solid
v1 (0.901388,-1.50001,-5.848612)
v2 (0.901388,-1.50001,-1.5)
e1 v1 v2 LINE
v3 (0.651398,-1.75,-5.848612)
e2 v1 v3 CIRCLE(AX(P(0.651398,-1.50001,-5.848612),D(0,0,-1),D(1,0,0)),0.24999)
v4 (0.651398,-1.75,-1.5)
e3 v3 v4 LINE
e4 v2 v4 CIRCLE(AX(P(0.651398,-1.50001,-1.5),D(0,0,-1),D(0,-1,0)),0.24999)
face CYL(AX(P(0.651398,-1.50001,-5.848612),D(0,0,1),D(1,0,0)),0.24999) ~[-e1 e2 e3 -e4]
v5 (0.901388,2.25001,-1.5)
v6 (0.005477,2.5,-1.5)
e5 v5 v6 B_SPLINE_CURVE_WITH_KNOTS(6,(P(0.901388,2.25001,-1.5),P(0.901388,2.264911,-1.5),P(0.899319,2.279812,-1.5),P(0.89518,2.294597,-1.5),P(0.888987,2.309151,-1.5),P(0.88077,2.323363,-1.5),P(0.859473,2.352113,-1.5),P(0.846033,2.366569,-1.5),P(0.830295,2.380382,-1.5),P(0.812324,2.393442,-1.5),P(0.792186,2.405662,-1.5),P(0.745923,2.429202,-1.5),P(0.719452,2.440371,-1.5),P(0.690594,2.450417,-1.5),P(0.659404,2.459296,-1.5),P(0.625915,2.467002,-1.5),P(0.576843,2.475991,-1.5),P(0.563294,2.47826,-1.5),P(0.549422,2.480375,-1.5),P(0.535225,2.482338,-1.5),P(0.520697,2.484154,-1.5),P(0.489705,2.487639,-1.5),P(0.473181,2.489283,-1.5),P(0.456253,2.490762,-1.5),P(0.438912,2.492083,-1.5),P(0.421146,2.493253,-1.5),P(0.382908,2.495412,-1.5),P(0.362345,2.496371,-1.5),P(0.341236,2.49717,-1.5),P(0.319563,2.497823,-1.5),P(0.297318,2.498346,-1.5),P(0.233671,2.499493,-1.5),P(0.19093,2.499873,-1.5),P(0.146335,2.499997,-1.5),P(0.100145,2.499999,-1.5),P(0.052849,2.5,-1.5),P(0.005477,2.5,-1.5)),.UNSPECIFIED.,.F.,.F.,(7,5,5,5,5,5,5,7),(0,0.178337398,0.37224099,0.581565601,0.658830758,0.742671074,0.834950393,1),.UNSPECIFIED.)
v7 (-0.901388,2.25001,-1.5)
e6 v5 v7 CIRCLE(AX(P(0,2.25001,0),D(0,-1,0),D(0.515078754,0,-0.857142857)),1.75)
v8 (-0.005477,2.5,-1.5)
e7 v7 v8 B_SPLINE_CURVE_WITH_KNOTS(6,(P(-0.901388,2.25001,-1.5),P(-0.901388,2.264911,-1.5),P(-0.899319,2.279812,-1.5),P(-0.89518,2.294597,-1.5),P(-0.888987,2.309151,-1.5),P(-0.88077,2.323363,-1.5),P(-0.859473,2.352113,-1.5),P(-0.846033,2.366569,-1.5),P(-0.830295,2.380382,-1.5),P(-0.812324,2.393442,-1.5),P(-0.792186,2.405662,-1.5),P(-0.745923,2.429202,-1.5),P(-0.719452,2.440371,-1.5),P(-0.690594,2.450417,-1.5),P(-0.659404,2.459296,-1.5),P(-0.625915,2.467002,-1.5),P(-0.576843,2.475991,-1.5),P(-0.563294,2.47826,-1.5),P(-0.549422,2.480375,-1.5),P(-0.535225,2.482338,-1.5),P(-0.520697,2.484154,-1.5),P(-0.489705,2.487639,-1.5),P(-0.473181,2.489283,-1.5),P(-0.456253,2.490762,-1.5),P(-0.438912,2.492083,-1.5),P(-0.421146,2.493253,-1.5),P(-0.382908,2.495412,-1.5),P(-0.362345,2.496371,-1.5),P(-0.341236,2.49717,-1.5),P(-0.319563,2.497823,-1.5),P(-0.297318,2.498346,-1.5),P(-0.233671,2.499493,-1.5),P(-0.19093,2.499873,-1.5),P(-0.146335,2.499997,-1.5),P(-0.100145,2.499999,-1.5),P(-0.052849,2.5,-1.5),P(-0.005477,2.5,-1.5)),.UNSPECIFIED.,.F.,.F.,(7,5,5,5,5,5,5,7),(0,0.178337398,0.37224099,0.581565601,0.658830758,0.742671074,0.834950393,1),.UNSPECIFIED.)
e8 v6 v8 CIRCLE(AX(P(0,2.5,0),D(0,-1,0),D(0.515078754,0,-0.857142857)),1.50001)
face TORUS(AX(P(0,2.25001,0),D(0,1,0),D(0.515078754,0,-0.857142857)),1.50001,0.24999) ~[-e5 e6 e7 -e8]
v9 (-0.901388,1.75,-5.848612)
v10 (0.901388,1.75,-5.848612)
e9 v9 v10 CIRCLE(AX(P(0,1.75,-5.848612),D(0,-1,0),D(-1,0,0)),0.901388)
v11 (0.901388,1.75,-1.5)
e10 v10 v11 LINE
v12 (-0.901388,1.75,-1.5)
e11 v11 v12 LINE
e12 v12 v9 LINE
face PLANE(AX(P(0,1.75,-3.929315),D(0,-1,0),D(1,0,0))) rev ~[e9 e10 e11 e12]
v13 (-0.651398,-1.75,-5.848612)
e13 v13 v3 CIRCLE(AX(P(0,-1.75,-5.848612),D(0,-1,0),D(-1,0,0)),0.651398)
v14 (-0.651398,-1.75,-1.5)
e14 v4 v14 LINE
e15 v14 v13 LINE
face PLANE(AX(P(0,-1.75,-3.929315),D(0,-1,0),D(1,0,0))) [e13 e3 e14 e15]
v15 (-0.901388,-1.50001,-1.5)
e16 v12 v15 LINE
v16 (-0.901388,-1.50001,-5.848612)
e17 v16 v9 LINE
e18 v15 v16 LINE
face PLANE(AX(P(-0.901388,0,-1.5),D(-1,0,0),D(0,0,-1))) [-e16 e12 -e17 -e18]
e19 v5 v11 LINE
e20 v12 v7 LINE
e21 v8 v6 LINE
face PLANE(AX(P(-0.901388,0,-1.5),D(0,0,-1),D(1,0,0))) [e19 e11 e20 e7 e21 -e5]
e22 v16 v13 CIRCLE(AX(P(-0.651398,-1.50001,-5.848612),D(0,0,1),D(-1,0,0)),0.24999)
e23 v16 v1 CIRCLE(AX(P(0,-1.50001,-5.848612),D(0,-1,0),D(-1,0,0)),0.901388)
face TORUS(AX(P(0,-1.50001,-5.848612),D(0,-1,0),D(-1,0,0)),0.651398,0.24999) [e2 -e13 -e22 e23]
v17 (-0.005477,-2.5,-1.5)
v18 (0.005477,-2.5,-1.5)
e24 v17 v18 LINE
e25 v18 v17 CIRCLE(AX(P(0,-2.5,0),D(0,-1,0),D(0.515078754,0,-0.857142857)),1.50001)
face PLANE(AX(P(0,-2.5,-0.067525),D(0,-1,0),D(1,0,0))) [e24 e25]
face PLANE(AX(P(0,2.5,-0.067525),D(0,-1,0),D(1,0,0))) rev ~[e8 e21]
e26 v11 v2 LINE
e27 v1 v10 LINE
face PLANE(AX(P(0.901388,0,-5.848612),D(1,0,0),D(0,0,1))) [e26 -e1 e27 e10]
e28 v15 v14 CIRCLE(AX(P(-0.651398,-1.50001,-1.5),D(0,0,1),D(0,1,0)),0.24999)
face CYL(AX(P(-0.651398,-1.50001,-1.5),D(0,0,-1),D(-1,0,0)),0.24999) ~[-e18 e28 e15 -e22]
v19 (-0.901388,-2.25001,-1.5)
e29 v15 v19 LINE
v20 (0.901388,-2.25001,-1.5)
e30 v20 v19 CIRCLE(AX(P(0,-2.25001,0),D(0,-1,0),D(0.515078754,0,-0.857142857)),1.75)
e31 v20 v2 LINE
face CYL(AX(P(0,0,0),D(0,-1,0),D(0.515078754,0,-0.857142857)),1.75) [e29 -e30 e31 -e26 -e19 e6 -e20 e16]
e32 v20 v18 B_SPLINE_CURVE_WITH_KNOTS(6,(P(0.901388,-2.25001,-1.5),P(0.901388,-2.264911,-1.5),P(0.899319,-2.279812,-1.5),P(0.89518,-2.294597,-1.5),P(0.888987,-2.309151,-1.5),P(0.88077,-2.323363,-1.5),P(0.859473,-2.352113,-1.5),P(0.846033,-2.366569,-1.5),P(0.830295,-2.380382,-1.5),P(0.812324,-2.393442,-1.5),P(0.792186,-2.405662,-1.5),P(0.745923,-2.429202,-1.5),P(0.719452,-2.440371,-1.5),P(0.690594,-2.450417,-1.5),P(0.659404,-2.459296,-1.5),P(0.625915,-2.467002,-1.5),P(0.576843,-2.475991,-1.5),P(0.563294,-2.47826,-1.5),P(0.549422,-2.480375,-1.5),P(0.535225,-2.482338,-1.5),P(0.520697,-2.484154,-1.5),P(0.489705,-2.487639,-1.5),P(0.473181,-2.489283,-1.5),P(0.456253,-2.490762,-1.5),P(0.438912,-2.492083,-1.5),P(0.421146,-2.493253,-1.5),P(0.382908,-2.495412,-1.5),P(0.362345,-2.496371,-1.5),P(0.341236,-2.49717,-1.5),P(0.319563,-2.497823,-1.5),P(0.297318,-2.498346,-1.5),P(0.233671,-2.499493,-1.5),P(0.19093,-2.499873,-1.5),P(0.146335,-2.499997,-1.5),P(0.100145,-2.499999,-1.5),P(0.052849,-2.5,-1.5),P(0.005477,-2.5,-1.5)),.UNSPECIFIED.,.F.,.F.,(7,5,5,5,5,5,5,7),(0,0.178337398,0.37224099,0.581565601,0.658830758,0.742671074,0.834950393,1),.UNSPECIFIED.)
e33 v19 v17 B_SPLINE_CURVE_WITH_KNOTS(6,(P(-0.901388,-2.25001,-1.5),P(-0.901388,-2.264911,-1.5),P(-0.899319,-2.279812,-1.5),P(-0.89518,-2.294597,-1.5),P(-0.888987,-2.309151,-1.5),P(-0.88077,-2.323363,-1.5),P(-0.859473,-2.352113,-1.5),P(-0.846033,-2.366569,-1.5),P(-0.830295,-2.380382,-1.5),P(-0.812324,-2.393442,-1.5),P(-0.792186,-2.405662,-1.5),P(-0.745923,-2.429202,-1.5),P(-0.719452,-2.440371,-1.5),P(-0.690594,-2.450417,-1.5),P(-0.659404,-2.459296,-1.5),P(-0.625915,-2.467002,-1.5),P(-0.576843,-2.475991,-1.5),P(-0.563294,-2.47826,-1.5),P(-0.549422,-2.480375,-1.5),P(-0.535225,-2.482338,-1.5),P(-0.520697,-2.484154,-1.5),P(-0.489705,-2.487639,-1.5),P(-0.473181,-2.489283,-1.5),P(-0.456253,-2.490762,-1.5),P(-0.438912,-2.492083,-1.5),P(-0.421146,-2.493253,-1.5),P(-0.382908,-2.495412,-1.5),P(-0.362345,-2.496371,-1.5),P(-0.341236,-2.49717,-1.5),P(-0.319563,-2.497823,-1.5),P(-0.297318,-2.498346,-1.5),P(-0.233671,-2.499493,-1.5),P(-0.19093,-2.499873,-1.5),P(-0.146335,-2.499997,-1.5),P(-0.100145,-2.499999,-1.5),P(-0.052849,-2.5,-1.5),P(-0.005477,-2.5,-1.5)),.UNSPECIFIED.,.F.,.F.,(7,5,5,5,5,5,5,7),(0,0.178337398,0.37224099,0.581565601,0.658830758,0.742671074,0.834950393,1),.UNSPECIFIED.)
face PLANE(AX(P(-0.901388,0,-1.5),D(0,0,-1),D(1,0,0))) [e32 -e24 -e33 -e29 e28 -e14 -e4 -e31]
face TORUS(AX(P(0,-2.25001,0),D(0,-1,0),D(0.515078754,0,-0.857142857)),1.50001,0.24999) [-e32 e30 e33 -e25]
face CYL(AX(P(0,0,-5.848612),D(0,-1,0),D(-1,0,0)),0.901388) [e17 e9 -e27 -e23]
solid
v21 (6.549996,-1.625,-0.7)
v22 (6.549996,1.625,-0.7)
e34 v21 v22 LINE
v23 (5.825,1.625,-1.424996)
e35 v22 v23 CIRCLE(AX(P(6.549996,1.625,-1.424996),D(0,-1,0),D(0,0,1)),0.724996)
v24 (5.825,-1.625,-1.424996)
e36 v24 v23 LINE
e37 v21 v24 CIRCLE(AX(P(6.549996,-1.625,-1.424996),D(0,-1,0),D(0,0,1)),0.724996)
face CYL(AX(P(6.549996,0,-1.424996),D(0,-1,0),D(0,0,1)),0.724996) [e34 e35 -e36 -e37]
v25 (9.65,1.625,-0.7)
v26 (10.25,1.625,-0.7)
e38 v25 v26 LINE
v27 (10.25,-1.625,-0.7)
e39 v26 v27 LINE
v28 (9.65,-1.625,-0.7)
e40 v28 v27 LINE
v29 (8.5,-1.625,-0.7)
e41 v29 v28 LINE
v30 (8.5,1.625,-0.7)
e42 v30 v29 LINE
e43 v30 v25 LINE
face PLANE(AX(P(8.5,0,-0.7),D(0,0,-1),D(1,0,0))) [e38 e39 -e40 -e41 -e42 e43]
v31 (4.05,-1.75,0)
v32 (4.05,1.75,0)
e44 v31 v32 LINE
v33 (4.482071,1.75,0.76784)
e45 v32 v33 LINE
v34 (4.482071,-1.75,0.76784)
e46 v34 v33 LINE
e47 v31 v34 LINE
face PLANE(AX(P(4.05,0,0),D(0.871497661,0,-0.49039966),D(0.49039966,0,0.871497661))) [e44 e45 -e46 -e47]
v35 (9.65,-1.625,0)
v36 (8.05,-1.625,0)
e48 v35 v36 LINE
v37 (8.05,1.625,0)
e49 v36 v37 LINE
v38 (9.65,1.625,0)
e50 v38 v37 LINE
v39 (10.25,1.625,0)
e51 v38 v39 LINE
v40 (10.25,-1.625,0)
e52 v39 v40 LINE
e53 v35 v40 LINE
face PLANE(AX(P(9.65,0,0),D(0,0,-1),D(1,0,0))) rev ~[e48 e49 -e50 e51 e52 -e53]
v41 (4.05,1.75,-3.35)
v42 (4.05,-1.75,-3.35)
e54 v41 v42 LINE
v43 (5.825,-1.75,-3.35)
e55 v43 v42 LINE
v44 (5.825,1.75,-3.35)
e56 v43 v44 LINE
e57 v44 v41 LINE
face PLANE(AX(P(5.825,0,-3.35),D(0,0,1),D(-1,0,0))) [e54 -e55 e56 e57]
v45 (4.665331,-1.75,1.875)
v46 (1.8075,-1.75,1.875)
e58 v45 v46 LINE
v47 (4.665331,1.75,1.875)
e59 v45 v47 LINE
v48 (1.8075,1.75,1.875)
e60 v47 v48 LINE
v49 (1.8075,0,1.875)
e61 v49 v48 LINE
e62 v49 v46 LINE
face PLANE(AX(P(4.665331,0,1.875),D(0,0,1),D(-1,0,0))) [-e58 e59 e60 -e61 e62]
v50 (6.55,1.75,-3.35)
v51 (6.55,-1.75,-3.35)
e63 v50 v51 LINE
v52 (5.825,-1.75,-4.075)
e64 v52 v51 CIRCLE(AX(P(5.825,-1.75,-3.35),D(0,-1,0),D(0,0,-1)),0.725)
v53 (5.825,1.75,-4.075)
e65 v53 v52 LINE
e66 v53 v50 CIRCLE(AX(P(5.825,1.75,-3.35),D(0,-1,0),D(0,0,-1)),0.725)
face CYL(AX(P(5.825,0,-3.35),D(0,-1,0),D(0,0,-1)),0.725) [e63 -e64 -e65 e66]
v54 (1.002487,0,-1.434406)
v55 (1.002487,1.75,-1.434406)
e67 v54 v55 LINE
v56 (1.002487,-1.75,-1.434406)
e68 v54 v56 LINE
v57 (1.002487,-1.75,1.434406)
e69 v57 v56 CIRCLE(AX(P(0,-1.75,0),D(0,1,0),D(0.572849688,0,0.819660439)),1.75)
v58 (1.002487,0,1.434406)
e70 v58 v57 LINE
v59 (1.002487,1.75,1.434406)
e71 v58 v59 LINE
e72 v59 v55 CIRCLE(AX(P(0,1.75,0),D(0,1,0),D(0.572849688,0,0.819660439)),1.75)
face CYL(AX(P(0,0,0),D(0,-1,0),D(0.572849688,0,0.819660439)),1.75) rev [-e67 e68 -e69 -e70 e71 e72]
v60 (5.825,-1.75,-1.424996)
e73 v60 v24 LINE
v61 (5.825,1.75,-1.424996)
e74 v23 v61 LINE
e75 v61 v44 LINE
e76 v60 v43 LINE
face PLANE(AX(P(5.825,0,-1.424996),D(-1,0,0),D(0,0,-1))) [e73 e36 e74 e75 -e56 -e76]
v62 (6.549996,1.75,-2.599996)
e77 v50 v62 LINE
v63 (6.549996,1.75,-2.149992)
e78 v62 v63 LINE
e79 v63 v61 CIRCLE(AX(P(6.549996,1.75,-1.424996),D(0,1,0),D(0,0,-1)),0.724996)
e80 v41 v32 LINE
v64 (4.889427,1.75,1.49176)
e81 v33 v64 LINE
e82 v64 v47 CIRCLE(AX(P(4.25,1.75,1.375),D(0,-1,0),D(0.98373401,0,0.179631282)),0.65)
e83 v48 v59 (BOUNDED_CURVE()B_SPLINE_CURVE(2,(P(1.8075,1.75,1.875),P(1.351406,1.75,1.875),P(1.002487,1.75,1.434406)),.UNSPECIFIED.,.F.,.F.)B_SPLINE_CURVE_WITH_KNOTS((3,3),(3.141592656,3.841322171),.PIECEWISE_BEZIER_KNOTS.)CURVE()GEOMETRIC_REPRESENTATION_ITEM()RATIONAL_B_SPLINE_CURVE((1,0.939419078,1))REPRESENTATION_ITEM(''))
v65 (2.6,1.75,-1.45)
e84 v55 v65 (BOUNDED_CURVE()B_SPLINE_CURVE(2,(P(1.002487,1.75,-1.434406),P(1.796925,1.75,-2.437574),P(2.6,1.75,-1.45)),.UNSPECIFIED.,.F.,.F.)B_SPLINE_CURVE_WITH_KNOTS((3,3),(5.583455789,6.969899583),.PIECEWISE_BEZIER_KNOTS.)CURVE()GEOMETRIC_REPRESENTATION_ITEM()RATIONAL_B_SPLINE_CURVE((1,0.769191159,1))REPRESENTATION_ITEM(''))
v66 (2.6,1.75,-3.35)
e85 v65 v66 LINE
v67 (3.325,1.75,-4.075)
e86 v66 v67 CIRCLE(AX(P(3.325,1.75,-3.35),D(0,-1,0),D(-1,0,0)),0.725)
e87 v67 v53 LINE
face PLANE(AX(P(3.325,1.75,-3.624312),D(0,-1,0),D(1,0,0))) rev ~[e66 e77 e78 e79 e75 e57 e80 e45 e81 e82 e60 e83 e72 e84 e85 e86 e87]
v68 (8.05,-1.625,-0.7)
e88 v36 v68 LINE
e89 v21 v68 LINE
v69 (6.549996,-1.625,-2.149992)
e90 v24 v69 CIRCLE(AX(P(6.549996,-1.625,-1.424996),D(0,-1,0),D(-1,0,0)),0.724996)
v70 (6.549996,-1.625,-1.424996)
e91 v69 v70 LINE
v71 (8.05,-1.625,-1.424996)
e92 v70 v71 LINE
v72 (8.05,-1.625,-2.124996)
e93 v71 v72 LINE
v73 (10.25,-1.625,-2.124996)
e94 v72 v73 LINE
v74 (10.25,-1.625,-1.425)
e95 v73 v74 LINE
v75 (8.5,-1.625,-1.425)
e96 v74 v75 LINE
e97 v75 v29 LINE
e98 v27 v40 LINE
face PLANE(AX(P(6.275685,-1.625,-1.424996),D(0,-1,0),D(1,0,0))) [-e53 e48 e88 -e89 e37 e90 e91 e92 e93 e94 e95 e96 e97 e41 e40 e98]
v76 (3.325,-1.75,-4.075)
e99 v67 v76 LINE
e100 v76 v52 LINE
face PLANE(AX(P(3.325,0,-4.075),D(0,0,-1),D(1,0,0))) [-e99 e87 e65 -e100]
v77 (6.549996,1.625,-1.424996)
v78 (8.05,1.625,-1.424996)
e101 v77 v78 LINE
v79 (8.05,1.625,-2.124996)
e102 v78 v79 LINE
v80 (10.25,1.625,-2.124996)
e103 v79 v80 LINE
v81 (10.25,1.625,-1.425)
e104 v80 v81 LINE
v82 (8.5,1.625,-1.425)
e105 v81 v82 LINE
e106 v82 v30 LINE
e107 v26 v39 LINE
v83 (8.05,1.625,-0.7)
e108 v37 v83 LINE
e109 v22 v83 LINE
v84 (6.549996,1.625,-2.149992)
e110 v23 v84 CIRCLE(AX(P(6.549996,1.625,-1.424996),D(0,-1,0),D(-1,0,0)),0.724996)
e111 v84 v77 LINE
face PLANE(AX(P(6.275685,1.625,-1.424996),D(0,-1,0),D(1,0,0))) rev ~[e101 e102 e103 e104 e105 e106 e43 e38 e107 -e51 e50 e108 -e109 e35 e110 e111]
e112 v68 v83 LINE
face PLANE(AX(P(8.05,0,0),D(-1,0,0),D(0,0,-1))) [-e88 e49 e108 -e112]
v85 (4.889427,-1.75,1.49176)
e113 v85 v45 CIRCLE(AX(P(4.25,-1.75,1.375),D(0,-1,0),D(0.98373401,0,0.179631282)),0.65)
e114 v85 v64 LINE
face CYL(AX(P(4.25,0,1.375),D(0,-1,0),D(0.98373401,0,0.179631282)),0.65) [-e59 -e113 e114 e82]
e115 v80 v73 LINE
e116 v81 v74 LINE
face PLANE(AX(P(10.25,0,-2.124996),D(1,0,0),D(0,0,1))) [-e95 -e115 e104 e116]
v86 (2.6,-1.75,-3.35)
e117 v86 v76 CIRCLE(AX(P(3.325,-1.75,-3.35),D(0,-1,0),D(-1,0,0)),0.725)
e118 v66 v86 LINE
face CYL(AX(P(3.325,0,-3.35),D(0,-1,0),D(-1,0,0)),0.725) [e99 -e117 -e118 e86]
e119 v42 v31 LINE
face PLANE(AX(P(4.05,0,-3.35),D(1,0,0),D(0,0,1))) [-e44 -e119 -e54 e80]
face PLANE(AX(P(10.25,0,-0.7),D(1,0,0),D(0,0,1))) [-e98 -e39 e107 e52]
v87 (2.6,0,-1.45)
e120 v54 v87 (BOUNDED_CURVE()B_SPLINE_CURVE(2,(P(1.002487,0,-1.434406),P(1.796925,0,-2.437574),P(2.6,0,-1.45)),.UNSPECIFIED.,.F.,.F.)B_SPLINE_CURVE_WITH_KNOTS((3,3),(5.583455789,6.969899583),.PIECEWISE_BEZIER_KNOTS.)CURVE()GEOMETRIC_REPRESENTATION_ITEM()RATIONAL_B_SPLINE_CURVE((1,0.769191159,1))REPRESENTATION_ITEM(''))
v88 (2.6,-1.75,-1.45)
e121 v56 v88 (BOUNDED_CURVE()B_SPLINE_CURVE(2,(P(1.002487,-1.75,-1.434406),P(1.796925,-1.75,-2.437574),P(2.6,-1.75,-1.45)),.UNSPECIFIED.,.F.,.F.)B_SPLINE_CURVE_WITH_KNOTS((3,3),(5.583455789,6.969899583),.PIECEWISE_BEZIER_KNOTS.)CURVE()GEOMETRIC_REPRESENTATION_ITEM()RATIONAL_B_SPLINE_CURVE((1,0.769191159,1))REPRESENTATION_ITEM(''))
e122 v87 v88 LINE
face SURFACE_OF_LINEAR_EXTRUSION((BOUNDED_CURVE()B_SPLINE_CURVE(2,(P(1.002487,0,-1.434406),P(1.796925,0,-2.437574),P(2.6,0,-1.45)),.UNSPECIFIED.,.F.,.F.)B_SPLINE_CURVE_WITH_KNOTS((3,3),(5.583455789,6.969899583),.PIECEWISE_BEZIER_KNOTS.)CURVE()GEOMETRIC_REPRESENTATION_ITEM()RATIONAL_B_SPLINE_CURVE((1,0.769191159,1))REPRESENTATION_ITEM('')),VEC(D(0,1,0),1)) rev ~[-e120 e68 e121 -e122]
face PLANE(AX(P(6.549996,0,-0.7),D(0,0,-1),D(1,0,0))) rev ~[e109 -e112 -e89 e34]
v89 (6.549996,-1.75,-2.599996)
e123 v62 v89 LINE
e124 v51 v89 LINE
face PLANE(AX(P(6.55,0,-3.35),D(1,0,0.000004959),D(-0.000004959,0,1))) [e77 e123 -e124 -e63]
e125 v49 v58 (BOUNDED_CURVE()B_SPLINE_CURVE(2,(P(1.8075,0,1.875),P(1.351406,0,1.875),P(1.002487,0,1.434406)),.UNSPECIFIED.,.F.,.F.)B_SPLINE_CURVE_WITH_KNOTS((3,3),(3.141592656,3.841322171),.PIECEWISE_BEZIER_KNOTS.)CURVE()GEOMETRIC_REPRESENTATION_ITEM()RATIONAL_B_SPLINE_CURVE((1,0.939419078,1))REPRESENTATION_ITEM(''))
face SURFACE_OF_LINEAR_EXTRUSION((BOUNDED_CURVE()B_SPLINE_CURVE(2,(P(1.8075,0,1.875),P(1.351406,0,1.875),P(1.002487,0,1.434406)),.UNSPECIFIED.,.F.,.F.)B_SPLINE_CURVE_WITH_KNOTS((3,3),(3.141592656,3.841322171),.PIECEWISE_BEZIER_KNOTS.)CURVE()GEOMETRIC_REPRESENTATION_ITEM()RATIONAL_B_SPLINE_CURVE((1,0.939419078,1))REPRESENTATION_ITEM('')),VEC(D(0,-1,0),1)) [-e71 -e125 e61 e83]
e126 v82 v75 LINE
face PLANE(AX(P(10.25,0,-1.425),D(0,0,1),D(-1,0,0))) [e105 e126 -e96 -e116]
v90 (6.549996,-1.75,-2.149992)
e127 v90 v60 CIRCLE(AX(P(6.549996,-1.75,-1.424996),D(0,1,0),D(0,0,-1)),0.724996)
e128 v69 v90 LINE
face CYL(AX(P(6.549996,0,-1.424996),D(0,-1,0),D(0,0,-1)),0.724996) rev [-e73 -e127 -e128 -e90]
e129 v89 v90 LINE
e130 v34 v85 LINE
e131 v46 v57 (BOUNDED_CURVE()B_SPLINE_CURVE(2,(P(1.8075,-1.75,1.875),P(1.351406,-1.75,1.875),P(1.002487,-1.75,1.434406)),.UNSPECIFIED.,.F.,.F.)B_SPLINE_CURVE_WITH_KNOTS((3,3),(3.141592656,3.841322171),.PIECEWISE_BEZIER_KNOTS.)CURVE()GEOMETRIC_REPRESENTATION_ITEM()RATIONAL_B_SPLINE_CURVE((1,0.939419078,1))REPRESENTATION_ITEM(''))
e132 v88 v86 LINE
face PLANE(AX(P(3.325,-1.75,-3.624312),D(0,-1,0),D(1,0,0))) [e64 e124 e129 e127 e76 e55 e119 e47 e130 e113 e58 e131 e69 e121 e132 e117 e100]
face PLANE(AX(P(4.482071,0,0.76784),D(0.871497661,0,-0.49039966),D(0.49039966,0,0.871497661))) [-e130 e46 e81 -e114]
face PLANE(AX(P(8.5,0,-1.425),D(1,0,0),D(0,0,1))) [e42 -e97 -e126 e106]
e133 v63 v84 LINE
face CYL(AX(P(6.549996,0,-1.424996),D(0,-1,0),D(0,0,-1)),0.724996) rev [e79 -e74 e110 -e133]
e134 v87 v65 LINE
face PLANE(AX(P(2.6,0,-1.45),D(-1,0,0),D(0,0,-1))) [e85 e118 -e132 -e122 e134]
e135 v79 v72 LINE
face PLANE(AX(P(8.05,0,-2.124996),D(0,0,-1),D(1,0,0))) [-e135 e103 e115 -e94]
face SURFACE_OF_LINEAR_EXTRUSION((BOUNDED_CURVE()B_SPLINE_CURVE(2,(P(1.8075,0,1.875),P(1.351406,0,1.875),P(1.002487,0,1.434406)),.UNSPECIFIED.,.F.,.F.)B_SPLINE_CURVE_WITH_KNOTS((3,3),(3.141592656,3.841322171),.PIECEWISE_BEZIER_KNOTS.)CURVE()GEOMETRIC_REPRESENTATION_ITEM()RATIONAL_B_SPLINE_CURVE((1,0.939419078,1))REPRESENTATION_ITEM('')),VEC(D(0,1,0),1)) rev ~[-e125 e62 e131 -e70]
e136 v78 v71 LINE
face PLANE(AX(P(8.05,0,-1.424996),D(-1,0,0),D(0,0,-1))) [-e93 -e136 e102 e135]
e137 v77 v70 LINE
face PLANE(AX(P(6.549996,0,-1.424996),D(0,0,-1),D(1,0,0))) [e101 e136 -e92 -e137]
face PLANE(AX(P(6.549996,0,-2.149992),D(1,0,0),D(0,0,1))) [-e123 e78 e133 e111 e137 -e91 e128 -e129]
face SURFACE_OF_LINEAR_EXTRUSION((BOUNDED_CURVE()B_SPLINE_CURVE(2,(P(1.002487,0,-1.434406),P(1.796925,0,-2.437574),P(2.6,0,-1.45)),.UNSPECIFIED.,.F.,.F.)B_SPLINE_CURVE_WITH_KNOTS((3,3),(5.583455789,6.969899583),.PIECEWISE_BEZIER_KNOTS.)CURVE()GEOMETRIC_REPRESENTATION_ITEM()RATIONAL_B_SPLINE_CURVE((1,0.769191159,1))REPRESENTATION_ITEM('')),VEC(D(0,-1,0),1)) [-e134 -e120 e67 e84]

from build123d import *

# Parameters (mm, degrees)
F1_DEPTH = 2.5
F2_DEPTH = 1.75
F3_R     = 0.24999
F6_DEPTH = 1.75
F7_DEPTH = 1.75
F5_W     = 0.725
F5_H     = 0.725
F8_DEPTH = 1.75
F5_W_2   = 1.5000037169
F5_H_2   = 0.7249962804
F5_W_3   = 0.6
F5_H_3   = 0.6999998717
F5_H_4   = 0.6999961522
F9_DEPTH = 1.625


# Not quite as in the source:
# - a fillet or chamfer is up to 0.001 mm smaller than in the source, because OpenCascade refuses the exact size
# - ends of sketch curves that miss each other by under 0.0002 mm in the source are joined


with BuildPart() as f1:
    # F0 (on Front) → F1 (new body, symmetric)
    with BuildSketch(Plane.XZ):
        with BuildLine():
            Line((-0.9013878189, -1.5), (0.9013878189, -1.5))
            ThreePointArc((0.9013878189, -1.5), (0, 1.75), (-0.9013878189, -1.5))
        make_face()
    extrude(amount=F1_DEPTH, both=True)

    # F0 (on Front) → F2 (join, symmetric)
    with BuildSketch(Plane.XZ):
        with BuildLine():
            Line((0.9013878189, -5.8486121811), (0.9013878189, -1.5))
            Line((0.9013878189, -1.5), (-0.9013878189, -1.5))
            Line((-0.9013878189, -1.5), (-0.9013878189, -5.8486121811))
            ThreePointArc((-0.9013878189, -5.8486121811), (0, -6.75), (0.9013878189, -5.8486121811))
        make_face()
    extrude(amount=F2_DEPTH, both=True)

    # F3 (radius 0.25 in the source; OpenCascade refuses exactly that, so slightly less here)
    f3_edges = [f1.edges().sort_by_distance(p)[0] for p in [
        (-0.901388, -1.75, -3.674306),
        (0, -2.5, 1.75),
        (0, 2.5, 1.75),
    ]]
    fillet(f3_edges, radius=F3_R)


with BuildPart() as f6:
    # F5 (on Front) → F6 (new body, symmetric)
    with BuildSketch(Plane.XZ):
        with BuildLine():
            ThreePointArc((1.0024869547, 1.4344057675), (1.75, 0), (1.0024869547, -1.4344057675))
            add(Edge.make_bspline(
                [(1.0024869563, -1.4344057663), (1.7969250862, -2.4375739072), (2.6000000016, -1.4500000013)],
                knots=[5.5834557893, 5.5834557893, 5.5834557893, 6.9698995825, 6.9698995825, 6.9698995825], degree=2, weights=[1, 0.7691911586, 1]))
            add(Edge.make_bspline(
                [(2.6000000016, -1.4500000013), (5.303822052, 1.8750000109), (1.8075004381, 1.875)],
                knots=[0.6867142753, 0.6867142753, 0.6867142753, 3.1415926557, 3.1415926557, 3.1415926557], degree=2, weights=[1, 0.3366501631, 1]))
            add(Edge.make_bspline(
                [(1.8075004381, 1.875), (1.3514063883, 1.8749999986), (1.0024869563, 1.4344057663)],
                knots=[3.1415926557, 3.1415926557, 3.1415926557, 3.8413221714, 3.8413221714, 3.8413221714], degree=2, weights=[1, 0.9394190785, 1]))
        make_face()
    extrude(amount=F6_DEPTH, both=True)

    # F5 (on Front) → F7 (join, symmetric)
    with BuildSketch(Plane.XZ):
        with BuildLine():
            add(Edge.make_bspline(
                [(2.6000000016, -1.4500000013), (5.303822052, 1.8750000109), (1.8075004381, 1.875)],
                knots=[0.6867142753, 0.6867142753, 0.6867142753, 3.1415926557, 3.1415926557, 3.1415926557], degree=2, weights=[1, 0.3366501631, 1]))
            Line((2.6, -1.45), (2.6, -3.35))
            Line((2.6, -3.35), (4.05, -3.35))
            Line((4.05, -3.35), (4.05, 0))
            Line((4.05, 0), (4.4820705548, 0.7678400066))
            ThreePointArc((4.4820705548, 0.7678400066), (3.6888877758, 1.0468947244), (3.8346688069, 1.875))
            Line((3.8346688069, 1.875), (1.8075004381, 1.875))
        make_face()
        with BuildLine():
            Line((4.6653311931, 1.875), (3.8346688069, 1.875))
            ThreePointArc((3.8346688069, 1.875), (3.6888877758, 1.0468947244), (4.4820705548, 0.7678400066))
            Line((4.4820705548, 0.7678400066), (4.8894271065, 1.4917603336))
            ThreePointArc((4.8894271065, 1.4917603336), (4.8111122242, 1.7031052756), (4.6653311931, 1.875))
        make_face()
    extrude(amount=F7_DEPTH, both=True)

    # F5 (on Front) → F8 (join, symmetric)
    with BuildSketch(Plane.XZ):
        with BuildLine():
            Line((4.05, -3.35), (2.6, -3.35))
            ThreePointArc((2.6, -3.35), (2.8123475836, -3.8626524164), (3.325, -4.075))
            ThreePointArc((3.325, -4.075), (3.8376524164, -3.8626524164), (4.05, -3.35))
        make_face()
        with BuildLine():
            Line((5.1000000026, -3.35), (4.05, -3.35))
            ThreePointArc((4.05, -3.35), (3.8376524164, -3.8626524164), (3.325, -4.075))
            Line((3.325, -4.075), (5.1000000026, -4.075))
            Line((5.1000000026, -4.075), (5.1000000026, -3.35))
        make_face()
        with Locations((5.4625000026, -3.7125)):
            Rectangle(F5_W, F5_H)
        with BuildLine():
            Line((5.8250000026, -2.625), (5.8250000026, -3.35))
            Line((5.8250000026, -3.35), (5.8250000026, -4.075))
            ThreePointArc((5.8250000026, -4.075), (6.337652419, -3.8626524164), (6.5500000026, -3.35))
            ThreePointArc((6.5500000026, -3.35), (6.337652419, -2.8373475836), (5.8250000026, -2.625))
        make_face()
        with BuildLine():
            Line((5.8250000026, -2.5999961522), (5.8250000026, -2.625))
            ThreePointArc((5.8250000026, -2.625), (6.337652419, -2.8373475836), (6.5500000026, -3.35))
            Line((6.5500000026, -3.35), (6.5499962831, -2.5999961522))
            Line((6.5499962831, -2.5999961522), (5.8250000026, -2.5999961522))
        make_face()
        with BuildLine():
            Line((5.8250000026, -1.4249961522), (5.8250000026, -2.5999961522))
            Line((5.8250000026, -2.5999961522), (6.5499962831, -2.5999961522))
            Line((6.5499962831, -2.5999961522), (6.5499962831, -2.1499924326))
            ThreePointArc((6.5499962831, -2.1499924326), (6.0373464968, -1.9376459384), (5.8250000026, -1.4249961522))
        make_face()
    extrude(amount=F8_DEPTH, both=True)

    # F5 (on Front) → F9 (join, symmetric)
    with BuildSketch(Plane.XZ):
        with BuildLine():
            ThreePointArc((6.5499962831, -0.6999998717), (6.0373464968, -0.9123463659), (5.8250000026, -1.4249961522))
            ThreePointArc((5.8250000026, -1.4249961522), (6.0373464968, -1.9376459384), (6.5499962831, -2.1499924326))
            Line((6.5499962831, -2.1499924326), (6.5499962831, -1.4249961522))
            Line((6.5499962831, -1.4249961522), (6.5499962831, -0.6999998717))
        make_face()
        with Locations((7.2999981415, -1.0624980119)):
            Rectangle(F5_W_2, F5_H_2)
        Polygon((8.05, 0), (8.05, -0.6999998717), (8.05, -1.4249961522), (8.05, -2.1249961522), (9.65, -2.1249961522), (9.65, -1.425), (8.5, -1.425), (8.5, -0.6999998717), (9.65, -0.6999998717), (9.65, 0), align=None)
        with Locations((9.95, -0.3499999359)):
            Rectangle(F5_W_3, F5_H_3)
        with Locations((9.95, -1.7749980761)):
            Rectangle(F5_W_3, F5_H_4)
    extrude(amount=F9_DEPTH, both=True)


solid = Compound([f1.part, f6.part])
